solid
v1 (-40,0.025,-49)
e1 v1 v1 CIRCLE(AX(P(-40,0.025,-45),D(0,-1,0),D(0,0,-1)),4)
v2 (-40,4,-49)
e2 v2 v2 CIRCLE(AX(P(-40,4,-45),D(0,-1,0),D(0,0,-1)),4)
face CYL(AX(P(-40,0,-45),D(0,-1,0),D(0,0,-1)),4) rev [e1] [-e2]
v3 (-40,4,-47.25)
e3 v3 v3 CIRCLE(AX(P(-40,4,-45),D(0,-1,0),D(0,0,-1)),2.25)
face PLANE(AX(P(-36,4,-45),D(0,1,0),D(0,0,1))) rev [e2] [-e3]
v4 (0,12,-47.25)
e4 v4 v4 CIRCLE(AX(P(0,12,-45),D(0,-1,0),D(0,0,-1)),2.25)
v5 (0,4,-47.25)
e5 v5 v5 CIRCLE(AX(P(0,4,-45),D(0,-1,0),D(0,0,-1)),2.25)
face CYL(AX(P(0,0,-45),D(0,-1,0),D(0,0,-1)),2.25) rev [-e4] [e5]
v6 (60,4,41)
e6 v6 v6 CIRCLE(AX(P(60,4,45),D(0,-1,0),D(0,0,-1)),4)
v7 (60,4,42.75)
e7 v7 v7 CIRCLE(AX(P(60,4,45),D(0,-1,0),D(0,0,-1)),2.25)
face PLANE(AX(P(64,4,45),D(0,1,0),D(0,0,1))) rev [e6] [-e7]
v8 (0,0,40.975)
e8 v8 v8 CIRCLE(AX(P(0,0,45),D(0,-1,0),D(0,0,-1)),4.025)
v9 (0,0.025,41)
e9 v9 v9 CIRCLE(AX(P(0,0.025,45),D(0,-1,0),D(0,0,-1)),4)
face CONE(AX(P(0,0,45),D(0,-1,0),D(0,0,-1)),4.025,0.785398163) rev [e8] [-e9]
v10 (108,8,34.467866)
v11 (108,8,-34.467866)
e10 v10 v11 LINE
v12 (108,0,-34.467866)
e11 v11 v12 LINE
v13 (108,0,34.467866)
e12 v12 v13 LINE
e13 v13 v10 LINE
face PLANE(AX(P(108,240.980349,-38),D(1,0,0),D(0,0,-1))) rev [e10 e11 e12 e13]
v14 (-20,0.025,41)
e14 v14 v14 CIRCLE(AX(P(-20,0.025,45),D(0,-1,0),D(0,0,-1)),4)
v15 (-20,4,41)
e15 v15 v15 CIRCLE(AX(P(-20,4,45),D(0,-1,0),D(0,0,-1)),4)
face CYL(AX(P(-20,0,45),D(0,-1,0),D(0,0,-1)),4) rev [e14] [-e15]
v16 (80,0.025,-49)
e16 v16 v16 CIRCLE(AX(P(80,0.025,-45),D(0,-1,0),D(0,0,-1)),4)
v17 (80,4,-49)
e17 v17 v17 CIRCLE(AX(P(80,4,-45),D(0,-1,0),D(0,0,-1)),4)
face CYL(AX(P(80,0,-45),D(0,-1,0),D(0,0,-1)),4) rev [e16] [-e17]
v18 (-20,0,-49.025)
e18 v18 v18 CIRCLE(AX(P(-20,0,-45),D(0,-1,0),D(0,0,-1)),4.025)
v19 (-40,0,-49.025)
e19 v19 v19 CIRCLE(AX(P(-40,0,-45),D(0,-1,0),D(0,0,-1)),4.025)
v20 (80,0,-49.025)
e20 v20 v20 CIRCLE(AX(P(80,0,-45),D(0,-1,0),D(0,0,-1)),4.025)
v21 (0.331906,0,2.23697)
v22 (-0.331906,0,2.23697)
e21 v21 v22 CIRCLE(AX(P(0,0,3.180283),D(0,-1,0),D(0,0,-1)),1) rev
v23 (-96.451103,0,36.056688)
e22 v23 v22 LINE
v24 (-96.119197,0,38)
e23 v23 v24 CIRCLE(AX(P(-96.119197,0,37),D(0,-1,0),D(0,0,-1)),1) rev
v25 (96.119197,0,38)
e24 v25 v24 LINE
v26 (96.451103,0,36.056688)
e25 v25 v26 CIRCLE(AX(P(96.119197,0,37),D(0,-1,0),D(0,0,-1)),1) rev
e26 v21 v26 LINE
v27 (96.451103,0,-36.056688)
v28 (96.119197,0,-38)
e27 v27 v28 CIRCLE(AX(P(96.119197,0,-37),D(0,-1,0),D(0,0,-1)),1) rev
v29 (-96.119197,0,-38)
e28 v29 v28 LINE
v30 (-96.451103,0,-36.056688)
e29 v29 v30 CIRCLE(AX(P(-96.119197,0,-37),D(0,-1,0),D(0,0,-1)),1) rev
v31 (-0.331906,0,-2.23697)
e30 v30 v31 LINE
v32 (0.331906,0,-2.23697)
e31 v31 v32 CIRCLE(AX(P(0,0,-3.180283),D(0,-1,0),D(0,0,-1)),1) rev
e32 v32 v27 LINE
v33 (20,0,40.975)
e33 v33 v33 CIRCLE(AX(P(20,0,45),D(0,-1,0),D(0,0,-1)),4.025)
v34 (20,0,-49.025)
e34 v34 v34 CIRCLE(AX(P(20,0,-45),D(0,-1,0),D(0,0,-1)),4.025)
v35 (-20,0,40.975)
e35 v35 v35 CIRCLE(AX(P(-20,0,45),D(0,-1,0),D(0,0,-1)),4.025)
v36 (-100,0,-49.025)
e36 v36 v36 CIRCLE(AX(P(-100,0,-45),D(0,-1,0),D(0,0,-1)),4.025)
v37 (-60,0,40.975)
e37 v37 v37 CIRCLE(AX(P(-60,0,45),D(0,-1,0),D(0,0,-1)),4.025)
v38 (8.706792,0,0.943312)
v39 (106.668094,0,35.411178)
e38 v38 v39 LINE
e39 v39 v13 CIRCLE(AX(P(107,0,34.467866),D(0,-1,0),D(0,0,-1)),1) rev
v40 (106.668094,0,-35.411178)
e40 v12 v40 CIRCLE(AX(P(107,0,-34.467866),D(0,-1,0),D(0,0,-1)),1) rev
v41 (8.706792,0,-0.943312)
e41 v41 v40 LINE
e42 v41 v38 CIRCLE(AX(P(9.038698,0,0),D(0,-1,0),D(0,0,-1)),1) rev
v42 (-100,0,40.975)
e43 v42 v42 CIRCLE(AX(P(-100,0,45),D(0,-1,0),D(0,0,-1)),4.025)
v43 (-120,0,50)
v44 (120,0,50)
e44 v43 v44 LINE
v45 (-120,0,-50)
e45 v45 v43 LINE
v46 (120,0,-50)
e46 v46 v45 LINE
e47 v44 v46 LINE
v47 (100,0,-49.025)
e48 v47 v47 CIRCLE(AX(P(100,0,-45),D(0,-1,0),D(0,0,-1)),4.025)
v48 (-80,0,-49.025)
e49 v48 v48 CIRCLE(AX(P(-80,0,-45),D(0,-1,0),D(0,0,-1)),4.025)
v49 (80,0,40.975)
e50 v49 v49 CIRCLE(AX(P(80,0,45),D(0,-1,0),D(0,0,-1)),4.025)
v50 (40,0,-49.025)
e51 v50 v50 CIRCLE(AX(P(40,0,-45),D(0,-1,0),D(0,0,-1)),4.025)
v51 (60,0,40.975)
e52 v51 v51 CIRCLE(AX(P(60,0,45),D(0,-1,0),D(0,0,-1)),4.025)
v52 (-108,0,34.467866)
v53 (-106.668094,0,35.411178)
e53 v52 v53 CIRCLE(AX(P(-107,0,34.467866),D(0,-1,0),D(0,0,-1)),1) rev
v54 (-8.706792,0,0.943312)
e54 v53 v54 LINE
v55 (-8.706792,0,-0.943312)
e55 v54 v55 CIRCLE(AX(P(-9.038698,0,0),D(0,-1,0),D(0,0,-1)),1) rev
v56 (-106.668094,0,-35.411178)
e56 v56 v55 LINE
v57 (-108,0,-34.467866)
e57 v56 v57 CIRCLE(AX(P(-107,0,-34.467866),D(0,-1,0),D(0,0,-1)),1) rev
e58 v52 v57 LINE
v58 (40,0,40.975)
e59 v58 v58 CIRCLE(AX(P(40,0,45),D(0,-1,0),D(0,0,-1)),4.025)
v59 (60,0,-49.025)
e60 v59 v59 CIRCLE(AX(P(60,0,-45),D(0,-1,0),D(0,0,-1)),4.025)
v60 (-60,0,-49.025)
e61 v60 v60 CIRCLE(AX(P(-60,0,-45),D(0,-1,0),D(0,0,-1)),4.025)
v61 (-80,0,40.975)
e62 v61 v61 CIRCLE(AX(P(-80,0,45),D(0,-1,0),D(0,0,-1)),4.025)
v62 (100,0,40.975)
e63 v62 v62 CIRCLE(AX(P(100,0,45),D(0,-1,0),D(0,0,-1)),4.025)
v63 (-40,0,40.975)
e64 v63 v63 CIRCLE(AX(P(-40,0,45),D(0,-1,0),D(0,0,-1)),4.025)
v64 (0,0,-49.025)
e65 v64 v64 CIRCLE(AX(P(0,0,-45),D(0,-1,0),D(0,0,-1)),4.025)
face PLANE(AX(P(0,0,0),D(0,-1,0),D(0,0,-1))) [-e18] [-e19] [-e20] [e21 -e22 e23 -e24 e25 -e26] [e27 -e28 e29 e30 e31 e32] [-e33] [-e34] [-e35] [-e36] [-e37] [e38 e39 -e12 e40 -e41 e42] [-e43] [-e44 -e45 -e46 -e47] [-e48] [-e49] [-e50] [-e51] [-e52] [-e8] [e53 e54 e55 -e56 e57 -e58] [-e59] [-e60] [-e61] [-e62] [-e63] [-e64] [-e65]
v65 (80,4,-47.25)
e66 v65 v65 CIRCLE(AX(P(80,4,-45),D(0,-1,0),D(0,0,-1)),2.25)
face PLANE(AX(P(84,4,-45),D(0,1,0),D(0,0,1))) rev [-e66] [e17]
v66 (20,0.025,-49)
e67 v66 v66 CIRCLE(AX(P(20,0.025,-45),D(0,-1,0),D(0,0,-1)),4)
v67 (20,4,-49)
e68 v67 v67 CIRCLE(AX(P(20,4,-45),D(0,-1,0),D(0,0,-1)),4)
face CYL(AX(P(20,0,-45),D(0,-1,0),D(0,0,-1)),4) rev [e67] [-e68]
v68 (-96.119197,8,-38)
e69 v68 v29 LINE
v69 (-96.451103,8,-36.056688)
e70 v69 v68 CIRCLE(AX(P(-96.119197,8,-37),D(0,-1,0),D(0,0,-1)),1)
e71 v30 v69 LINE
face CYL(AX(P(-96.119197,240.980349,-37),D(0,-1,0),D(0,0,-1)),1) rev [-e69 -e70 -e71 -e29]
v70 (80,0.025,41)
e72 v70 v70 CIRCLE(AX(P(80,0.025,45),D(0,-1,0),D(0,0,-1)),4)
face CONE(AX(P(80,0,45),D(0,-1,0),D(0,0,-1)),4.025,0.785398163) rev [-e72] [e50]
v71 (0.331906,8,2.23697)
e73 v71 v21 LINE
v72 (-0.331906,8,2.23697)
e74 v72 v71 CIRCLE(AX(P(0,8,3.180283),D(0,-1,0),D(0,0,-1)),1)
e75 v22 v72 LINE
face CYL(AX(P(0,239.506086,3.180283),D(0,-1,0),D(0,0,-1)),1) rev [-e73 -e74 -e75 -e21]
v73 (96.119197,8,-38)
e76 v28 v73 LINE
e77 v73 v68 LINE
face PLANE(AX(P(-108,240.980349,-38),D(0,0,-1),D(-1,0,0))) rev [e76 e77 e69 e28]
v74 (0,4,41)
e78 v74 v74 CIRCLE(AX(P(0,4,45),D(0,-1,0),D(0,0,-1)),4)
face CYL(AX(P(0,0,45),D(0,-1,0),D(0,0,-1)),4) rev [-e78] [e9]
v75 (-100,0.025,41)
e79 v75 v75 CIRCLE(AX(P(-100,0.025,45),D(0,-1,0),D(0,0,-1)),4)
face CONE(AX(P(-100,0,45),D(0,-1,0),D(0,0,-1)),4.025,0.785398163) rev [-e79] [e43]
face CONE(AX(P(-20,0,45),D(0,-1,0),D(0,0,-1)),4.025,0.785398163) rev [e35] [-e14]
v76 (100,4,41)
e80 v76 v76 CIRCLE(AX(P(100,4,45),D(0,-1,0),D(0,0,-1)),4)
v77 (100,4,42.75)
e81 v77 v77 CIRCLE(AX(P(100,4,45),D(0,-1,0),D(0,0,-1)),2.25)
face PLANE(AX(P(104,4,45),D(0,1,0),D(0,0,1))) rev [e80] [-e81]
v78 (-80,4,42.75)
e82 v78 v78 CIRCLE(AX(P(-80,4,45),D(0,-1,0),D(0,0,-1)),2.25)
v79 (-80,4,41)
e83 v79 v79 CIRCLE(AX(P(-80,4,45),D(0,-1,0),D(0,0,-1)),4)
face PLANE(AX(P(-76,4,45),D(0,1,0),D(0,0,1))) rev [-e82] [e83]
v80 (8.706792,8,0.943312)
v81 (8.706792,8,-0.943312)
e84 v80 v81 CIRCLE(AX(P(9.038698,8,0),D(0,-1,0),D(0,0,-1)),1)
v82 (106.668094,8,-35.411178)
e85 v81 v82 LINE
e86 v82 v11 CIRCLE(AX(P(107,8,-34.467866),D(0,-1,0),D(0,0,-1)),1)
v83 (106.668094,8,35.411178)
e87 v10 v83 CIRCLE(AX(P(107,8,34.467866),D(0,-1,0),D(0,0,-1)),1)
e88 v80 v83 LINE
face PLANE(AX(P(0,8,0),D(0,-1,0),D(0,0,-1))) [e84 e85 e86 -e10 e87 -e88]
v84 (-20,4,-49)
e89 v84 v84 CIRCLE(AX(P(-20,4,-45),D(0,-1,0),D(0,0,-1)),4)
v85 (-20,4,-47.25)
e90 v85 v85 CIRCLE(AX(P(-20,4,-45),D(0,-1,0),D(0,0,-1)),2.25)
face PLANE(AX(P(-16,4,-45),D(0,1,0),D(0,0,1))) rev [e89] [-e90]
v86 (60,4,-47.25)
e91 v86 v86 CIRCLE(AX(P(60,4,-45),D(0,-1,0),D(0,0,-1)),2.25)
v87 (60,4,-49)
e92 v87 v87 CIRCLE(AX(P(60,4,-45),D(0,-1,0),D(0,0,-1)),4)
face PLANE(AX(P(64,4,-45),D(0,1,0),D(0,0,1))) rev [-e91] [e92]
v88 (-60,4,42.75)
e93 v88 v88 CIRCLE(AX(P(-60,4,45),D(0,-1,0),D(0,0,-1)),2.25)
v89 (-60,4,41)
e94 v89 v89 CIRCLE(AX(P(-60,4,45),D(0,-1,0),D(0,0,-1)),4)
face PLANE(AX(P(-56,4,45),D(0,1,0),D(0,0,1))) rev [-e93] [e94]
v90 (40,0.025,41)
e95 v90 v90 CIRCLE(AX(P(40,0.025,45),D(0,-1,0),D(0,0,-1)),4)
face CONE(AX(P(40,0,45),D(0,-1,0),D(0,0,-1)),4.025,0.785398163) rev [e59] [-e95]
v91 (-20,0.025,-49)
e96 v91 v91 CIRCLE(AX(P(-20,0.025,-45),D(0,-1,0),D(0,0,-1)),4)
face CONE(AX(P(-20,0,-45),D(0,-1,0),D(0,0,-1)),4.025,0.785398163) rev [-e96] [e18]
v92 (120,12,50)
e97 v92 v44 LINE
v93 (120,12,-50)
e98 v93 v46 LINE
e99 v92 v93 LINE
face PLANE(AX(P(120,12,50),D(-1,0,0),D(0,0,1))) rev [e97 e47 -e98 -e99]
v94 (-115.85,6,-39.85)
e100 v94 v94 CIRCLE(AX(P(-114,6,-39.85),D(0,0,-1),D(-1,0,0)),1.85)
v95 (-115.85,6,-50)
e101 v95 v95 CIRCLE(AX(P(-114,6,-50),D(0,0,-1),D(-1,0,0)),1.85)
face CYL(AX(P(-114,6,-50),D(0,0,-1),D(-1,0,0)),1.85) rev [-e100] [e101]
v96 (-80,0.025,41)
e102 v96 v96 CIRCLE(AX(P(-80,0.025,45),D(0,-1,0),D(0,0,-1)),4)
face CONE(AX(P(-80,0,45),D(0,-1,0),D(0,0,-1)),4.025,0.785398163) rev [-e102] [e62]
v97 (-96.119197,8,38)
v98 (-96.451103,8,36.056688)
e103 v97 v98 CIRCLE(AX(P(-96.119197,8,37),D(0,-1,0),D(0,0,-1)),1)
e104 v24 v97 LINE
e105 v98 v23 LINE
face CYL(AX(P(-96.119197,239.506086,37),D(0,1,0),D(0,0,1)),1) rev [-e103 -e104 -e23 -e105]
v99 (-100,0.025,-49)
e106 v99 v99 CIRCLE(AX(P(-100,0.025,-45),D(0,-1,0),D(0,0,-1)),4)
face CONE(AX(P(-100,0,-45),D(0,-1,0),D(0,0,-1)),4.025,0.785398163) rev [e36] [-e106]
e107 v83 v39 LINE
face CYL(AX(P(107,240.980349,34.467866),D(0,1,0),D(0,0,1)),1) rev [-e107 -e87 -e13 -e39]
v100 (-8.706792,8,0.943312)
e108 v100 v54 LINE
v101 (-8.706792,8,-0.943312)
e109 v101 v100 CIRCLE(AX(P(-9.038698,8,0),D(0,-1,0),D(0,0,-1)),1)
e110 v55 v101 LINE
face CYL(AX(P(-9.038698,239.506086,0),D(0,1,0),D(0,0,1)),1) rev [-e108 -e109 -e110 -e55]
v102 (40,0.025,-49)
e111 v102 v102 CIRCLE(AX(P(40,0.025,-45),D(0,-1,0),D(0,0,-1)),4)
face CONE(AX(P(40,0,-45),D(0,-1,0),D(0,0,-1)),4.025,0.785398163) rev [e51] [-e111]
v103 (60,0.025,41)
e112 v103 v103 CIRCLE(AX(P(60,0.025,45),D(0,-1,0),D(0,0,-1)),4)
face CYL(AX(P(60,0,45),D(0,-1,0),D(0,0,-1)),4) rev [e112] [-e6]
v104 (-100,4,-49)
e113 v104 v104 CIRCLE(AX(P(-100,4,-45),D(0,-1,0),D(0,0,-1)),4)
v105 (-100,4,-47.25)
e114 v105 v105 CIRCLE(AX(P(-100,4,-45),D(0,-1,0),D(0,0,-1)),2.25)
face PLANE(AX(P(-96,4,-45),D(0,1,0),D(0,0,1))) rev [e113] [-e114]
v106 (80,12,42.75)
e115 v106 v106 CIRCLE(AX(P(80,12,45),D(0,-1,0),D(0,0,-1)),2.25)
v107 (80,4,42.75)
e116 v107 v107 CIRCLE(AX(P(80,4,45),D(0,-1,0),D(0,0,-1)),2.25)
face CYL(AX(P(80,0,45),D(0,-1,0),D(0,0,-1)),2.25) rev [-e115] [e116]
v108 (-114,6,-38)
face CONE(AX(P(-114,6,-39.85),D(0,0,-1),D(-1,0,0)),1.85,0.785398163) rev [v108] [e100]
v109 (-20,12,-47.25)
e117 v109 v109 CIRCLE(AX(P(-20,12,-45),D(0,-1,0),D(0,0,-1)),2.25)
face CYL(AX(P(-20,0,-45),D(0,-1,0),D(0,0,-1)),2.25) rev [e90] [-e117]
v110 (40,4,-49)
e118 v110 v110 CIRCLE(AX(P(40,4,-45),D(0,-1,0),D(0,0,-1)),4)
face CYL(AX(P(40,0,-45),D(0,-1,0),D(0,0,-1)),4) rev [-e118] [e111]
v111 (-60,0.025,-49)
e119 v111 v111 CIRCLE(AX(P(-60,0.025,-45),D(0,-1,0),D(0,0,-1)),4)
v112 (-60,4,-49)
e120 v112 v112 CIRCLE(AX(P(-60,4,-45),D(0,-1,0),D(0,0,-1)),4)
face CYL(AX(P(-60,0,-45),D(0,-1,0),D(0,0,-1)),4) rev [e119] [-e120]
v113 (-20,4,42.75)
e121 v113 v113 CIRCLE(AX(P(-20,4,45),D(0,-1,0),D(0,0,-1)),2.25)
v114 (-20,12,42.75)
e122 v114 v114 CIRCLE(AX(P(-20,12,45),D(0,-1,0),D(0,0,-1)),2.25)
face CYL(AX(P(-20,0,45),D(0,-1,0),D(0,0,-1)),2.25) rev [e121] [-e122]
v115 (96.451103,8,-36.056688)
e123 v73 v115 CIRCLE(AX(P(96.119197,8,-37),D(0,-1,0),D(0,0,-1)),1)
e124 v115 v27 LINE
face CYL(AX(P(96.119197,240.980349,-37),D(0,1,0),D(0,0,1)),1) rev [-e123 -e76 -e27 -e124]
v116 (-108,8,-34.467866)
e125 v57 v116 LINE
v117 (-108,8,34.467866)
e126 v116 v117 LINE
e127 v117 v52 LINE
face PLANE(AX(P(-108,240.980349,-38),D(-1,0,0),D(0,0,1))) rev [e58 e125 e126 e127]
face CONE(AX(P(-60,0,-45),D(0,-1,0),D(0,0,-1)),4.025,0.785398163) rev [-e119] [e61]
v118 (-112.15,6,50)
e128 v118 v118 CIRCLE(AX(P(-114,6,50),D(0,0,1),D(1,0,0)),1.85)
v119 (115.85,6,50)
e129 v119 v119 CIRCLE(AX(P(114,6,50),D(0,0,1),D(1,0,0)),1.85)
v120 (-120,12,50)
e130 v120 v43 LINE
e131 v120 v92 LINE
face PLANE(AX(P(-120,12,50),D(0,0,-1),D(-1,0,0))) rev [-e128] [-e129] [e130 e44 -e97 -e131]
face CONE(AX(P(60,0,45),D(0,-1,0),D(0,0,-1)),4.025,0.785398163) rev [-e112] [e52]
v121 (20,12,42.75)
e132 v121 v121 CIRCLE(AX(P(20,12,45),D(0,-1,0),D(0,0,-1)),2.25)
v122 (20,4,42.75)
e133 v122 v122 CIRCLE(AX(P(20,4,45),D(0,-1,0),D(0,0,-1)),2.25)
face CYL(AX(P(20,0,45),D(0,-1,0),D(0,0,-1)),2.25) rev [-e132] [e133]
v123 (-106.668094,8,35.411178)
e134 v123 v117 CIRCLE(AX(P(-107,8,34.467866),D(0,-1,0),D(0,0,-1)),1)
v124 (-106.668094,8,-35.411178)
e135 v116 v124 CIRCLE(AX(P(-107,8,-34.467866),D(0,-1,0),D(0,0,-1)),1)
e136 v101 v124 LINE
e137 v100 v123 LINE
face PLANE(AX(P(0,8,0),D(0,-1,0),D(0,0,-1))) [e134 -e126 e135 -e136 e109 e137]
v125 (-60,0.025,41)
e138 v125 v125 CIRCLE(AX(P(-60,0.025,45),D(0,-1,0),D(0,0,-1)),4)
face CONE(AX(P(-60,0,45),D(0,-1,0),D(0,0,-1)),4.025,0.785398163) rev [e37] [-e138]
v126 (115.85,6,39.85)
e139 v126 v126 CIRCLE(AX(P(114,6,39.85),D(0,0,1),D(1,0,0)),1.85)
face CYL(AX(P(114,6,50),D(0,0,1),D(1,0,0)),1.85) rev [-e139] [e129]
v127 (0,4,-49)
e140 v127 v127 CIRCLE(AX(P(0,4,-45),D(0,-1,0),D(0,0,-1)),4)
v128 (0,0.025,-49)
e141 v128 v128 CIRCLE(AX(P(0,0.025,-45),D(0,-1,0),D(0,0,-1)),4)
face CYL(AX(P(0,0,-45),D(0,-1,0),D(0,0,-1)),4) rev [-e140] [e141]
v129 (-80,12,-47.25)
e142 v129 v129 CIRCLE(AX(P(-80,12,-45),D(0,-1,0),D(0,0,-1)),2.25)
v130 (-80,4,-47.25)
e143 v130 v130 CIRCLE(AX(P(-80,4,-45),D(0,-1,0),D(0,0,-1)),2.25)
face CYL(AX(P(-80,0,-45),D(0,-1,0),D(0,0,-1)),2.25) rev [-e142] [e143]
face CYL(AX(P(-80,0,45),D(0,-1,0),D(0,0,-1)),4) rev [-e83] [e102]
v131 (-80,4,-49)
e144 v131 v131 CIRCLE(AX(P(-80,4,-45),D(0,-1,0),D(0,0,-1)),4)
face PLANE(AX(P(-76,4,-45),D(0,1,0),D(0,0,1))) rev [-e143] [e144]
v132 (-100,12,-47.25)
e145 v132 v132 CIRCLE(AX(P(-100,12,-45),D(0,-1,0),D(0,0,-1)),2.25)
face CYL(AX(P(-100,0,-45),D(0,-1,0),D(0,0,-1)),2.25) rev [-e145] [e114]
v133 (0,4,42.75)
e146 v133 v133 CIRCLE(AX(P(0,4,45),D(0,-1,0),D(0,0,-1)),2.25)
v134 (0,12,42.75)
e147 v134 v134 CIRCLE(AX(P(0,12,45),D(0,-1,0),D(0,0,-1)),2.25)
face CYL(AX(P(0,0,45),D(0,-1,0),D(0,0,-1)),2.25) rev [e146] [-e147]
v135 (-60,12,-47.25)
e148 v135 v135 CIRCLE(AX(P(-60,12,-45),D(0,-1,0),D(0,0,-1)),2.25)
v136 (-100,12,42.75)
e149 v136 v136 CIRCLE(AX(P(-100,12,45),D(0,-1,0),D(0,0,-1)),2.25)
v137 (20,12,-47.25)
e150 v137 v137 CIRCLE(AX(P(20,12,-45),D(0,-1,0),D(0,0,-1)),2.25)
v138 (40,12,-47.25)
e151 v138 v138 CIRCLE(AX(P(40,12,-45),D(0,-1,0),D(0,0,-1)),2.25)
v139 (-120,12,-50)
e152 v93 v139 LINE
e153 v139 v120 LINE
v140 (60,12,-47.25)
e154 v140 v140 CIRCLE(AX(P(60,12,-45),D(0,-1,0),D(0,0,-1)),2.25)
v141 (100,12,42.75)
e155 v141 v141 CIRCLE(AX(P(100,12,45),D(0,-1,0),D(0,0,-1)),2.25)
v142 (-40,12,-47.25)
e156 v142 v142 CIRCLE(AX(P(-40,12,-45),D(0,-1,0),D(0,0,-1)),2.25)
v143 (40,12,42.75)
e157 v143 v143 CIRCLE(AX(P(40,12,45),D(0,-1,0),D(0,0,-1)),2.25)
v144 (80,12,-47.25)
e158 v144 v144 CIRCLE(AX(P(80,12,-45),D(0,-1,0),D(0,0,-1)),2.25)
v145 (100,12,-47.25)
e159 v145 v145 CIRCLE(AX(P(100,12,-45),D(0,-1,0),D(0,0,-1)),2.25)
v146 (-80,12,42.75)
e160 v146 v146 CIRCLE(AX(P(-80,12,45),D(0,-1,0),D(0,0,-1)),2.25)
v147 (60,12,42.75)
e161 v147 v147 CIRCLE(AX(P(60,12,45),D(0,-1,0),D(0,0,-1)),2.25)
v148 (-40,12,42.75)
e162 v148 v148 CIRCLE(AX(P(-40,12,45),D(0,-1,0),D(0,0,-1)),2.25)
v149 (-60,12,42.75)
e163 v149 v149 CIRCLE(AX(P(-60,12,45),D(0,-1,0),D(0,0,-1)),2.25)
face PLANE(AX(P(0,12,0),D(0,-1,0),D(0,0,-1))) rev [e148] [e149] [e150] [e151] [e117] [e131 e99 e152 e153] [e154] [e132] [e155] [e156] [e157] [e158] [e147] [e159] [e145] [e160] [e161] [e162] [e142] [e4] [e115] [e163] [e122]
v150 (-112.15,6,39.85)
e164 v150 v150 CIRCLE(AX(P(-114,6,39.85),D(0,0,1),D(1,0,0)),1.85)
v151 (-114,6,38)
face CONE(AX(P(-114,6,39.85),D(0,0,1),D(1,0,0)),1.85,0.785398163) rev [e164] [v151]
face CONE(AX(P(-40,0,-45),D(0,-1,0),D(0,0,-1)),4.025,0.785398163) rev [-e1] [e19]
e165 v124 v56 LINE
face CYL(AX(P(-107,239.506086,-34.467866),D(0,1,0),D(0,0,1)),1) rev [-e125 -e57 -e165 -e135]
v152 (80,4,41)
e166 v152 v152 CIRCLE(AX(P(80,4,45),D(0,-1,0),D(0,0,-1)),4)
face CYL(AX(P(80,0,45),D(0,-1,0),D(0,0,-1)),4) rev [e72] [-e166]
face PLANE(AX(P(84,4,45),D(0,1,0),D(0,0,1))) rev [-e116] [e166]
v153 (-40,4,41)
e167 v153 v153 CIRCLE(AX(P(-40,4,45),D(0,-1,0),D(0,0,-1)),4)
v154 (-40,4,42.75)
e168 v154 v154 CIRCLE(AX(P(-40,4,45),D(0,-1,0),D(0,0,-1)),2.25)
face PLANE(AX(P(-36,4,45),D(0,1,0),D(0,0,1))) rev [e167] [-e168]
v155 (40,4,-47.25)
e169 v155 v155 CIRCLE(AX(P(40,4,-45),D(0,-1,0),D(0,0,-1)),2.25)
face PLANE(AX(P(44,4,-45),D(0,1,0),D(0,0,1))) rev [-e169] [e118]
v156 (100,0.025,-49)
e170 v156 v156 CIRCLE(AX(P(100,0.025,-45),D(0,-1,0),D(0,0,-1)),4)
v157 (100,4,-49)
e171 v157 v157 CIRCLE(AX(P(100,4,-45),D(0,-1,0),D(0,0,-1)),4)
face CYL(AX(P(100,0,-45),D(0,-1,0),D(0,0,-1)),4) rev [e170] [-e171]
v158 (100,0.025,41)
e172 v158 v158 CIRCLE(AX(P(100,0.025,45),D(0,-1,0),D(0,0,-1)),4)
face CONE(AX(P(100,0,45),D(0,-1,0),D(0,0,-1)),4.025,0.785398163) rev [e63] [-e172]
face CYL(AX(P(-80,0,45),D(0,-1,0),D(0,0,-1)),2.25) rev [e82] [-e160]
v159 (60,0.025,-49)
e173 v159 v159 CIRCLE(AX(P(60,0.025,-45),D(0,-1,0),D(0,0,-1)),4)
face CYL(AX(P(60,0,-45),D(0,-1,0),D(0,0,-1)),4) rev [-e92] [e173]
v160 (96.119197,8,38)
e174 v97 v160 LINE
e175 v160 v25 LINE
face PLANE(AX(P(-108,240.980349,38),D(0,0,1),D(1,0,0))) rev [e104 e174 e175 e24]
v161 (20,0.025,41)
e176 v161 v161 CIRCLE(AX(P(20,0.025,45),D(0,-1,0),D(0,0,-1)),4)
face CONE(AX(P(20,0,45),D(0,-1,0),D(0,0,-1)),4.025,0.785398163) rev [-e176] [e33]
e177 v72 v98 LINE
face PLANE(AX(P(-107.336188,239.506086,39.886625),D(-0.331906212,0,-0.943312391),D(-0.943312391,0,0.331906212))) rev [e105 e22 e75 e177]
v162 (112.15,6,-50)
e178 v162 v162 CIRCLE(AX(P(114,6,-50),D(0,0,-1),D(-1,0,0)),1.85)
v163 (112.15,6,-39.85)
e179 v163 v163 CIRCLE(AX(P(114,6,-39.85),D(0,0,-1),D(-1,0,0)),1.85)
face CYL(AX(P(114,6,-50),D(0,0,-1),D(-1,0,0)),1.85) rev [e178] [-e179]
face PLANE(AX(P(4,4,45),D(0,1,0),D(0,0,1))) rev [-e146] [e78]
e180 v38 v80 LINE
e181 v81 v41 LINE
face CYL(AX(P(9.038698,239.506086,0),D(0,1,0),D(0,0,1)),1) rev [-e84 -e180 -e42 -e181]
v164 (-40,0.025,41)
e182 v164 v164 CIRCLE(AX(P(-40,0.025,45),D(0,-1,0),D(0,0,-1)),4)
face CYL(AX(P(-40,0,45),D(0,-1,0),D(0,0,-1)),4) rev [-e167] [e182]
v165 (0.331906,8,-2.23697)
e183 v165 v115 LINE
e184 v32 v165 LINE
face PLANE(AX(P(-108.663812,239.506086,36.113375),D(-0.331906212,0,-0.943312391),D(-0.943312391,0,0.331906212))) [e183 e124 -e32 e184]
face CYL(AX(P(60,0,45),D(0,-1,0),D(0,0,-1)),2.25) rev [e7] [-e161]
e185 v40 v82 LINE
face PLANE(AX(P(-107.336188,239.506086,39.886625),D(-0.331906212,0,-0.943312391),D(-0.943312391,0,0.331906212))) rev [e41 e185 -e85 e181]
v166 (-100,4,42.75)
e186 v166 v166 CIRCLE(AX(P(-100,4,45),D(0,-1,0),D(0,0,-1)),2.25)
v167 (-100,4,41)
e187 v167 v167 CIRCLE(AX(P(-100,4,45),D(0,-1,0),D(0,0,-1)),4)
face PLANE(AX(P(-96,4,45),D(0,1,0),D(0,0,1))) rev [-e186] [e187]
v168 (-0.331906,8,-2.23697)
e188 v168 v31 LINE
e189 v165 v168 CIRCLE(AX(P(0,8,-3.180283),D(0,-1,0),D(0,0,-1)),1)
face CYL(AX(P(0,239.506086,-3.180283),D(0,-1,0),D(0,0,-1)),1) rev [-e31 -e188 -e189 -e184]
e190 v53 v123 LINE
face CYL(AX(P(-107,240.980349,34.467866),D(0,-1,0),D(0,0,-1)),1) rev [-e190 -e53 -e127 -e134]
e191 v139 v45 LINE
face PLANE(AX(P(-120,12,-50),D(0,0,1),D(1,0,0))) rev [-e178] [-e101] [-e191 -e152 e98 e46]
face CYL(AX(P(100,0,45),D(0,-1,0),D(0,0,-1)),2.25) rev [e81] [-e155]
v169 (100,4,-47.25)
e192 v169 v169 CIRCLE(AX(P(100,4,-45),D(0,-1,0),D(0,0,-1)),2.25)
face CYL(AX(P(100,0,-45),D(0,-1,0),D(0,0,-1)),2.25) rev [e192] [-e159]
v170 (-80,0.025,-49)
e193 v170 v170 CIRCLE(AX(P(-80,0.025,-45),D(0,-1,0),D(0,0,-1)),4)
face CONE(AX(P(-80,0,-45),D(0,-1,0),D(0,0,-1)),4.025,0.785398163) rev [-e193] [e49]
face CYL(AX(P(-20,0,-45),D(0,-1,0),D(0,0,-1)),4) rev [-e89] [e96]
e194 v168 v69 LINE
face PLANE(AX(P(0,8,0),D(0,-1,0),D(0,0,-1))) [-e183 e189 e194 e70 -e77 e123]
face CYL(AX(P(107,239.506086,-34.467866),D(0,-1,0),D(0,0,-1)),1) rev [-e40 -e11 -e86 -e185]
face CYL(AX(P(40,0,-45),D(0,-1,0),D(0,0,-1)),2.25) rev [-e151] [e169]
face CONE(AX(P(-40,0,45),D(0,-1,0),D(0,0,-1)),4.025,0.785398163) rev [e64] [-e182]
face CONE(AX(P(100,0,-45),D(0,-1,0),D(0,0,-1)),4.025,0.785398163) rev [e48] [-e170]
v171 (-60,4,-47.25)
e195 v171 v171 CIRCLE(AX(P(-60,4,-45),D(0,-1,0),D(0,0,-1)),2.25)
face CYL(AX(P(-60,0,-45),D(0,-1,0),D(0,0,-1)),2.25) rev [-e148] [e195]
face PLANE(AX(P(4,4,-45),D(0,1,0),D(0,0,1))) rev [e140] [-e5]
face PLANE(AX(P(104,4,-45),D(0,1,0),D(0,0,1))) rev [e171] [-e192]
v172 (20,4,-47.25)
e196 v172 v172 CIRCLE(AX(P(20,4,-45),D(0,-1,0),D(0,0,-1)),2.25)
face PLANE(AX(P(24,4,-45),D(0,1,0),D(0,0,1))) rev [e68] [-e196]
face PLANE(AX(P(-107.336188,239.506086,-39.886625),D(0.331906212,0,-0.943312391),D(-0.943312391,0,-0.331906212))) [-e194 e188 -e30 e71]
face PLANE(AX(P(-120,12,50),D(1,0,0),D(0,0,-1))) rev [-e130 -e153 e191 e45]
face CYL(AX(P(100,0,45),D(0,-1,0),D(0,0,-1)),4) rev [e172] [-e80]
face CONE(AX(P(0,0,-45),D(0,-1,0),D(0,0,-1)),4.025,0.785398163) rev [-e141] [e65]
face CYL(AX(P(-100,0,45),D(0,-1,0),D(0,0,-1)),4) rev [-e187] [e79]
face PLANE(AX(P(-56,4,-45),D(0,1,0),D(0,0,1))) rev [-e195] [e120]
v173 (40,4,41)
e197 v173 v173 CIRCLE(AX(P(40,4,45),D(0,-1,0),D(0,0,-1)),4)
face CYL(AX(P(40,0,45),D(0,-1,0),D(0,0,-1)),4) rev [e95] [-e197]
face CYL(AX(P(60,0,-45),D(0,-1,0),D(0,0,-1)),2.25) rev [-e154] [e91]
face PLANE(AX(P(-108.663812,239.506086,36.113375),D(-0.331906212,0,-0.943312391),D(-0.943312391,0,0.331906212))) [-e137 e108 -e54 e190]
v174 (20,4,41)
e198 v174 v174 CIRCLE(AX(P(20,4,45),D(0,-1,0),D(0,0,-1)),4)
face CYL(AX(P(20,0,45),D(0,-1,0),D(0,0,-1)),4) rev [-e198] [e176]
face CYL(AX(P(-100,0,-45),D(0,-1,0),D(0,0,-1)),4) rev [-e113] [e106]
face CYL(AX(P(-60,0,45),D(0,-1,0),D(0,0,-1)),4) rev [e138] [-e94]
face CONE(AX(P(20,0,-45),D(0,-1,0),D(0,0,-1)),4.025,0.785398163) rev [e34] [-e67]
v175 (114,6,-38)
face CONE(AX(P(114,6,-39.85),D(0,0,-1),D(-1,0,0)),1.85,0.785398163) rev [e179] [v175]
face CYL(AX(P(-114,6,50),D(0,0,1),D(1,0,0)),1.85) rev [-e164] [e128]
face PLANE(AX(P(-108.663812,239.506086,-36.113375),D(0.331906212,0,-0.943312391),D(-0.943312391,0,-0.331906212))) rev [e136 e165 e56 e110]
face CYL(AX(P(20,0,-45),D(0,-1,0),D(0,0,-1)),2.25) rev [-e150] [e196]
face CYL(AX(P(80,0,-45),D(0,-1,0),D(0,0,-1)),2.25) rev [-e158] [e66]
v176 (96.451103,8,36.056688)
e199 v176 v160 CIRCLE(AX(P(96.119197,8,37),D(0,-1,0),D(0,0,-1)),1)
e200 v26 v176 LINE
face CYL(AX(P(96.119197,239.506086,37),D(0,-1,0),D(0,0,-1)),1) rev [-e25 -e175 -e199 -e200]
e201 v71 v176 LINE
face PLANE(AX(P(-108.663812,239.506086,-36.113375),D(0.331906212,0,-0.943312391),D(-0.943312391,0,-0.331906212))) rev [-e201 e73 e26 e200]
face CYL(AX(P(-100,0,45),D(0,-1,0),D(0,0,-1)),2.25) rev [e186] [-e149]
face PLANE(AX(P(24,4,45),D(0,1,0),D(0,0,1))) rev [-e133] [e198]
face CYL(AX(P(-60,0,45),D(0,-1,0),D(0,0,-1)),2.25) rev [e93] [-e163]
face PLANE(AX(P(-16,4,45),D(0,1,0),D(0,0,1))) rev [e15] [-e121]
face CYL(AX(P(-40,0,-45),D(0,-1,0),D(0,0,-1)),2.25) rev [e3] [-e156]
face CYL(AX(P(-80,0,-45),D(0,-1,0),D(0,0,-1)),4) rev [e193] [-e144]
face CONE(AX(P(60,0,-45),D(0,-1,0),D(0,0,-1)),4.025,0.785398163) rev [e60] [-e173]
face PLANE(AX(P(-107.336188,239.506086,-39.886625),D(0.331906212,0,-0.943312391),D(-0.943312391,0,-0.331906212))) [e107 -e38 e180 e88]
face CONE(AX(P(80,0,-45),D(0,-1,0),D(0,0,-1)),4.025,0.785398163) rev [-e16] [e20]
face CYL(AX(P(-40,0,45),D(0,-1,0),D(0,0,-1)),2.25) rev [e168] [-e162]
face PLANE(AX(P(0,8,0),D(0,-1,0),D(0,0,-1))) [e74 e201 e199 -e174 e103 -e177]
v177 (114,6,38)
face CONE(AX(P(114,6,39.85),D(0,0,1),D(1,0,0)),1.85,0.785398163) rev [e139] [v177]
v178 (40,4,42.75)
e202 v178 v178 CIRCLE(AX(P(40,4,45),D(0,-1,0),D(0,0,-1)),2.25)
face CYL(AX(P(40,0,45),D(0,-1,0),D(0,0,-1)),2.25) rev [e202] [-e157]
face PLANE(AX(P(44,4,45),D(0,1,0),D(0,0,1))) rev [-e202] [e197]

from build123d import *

# Parameters (mm, degrees)
SKETCH2_W           = 240
SKETCH2_H           = 100
BOSS_EXTRUDE1_DEPTH = 12
HOLE1_AT_2_COUNT    = 2
HOLE1_AT_2_PITCH    = 228
SKETCH10_W          = 216
SKETCH10_H          = 76
CUT_EXTRUDE2_DEPTH  = 8
EXTRUDE_THIN1_DEPTH = 8
FILLET1_R           = 1


# Read off the part's stored shape, not the designer's step: CBORE for M4 SHCS1
with BuildPart() as part:
    # Sketch2 → Boss-Extrude1 (new body)
    with BuildSketch(Plane(origin=(0, 0, 0), x_dir=(1, 0, 0), z_dir=(0, 1, 0))):
        Rectangle(SKETCH2_W, SKETCH2_H)
    extrude(amount=BOSS_EXTRUDE1_DEPTH)

    # Sketch6 → Hole1 (revolve, cut)
    with BuildSketch(Plane(origin=(-114, 6, 50), x_dir=(0, -1, 0), z_dir=(1, 0, 0))):
        Polygon((0, 0), (0, 12), (1.85, 10.15), (1.85, 0), align=None)
    hole1 = revolve(axis=Axis((-114, 6, 54.244199587), (0, 0, -1)), mode=Mode.SUBTRACT)

    # Hole1 at 2: Hole1 ×2
    with Locations(*[(i * HOLE1_AT_2_PITCH, 0, 0) for i in range(1, HOLE1_AT_2_COUNT)]):
        add(hole1, mode=Mode.SUBTRACT)

    # Mirror2: Hole1 across plane
    add(hole1.mirror(Plane.XY), mode=Mode.SUBTRACT)

    # Mirror2 copy 1 sketch → Mirror2 copy 1 (revolve, cut)
    with BuildSketch(Plane(origin=(114, 6, -50), x_dir=(0, -1, 0), z_dir=(1, 0, 0))):
        Polygon((0, 0), (0, -12), (1.85, -10.15), (1.85, 0), align=None)
    revolve(axis=Axis((114, 6, -54.244199587), (0, 0, -1)), mode=Mode.SUBTRACT)

    # CBORE for M4 SHCS1 outline → CBORE for M4 SHCS1 (revolve, cut)
    with BuildSketch(Plane(origin=(-100, 0, -45), x_dir=(1, 0, 0), z_dir=(0, 0, 1))):
        Polygon((2.25, 4), (2.25, 12), (0, 12), (0, 0), (4.025, 0), (4, 0.025), (4, 4), align=None)
    revolve(axis=Axis((-100, 0, -45), (0, 1, 0)), mode=Mode.SUBTRACT)

    # CBORE for M4 SHCS1 2 outline → CBORE for M4 SHCS1 2 (revolve, cut)
    with BuildSketch(Plane(origin=(-100, 0, 45), x_dir=(1, 0, 0), z_dir=(0, 0, 1))):
        Polygon((0, 0), (4.025, 0), (4, 0.025), (4, 4), (2.25, 4), (2.25, 12), (0, 12), align=None)
    revolve(axis=Axis((-100, 0, 45), (0, 1, 0)), mode=Mode.SUBTRACT)

    # CBORE for M4 SHCS1 3 outline → CBORE for M4 SHCS1 3 (revolve, cut)
    with BuildSketch(Plane(origin=(-80, 0, -45), x_dir=(1, 0, 0), z_dir=(0, 0, 1))):
        Polygon((0, 0), (4.025, 0), (4, 0.025), (4, 4), (2.25, 4), (2.25, 12), (0, 12), align=None)
    revolve(axis=Axis((-80, 0, -45), (0, 1, 0)), mode=Mode.SUBTRACT)

    # CBORE for M4 SHCS1 4 outline → CBORE for M4 SHCS1 4 (revolve, cut)
    with BuildSketch(Plane(origin=(-80, 0, 45), x_dir=(1, 0, 0), z_dir=(0, 0, 1))):
        Polygon((0, 0), (4.025, 0), (4, 0.025), (4, 4), (2.25, 4), (2.25, 12), (0, 12), align=None)
    revolve(axis=Axis((-80, 0, 45), (0, 1, 0)), mode=Mode.SUBTRACT)

    # CBORE for M4 SHCS1 5 outline → CBORE for M4 SHCS1 5 (revolve, cut)
    with BuildSketch(Plane(origin=(-60, 0, -45), x_dir=(1, 0, 0), z_dir=(0, 0, 1))):
        Polygon((0, 0), (4.025, 0), (4, 0.025), (4, 4), (2.25, 4), (2.25, 12), (0, 12), align=None)
    revolve(axis=Axis((-60, 0, -45), (0, 1, 0)), mode=Mode.SUBTRACT)

    # CBORE for M4 SHCS1 6 outline → CBORE for M4 SHCS1 6 (revolve, cut)
    with BuildSketch(Plane(origin=(-60, 0, 45), x_dir=(1, 0, 0), z_dir=(0, 0, 1))):
        Polygon((0, 0), (4.025, 0), (4, 0.025), (4, 4), (2.25, 4), (2.25, 12), (0, 12), align=None)
    revolve(axis=Axis((-60, 0, 45), (0, 1, 0)), mode=Mode.SUBTRACT)

    # CBORE for M4 SHCS1 7 outline → CBORE for M4 SHCS1 7 (revolve, cut)
    with BuildSketch(Plane(origin=(-40, 0, -45), x_dir=(1, 0, 0), z_dir=(0, 0, 1))):
        Polygon((0, 0), (4.025, 0), (4, 0.025), (4, 4), (2.25, 4), (2.25, 12), (0, 12), align=None)
    revolve(axis=Axis((-40, 0, -45), (0, 1, 0)), mode=Mode.SUBTRACT)

    # CBORE for M4 SHCS1 8 outline → CBORE for M4 SHCS1 8 (revolve, cut)
    with BuildSketch(Plane(origin=(-40, 0, 45), x_dir=(1, 0, 0), z_dir=(0, 0, 1))):
        Polygon((0, 0), (4.025, 0), (4, 0.025), (4, 4), (2.25, 4), (2.25, 12), (0, 12), align=None)
    revolve(axis=Axis((-40, 0, 45), (0, 1, 0)), mode=Mode.SUBTRACT)

    # CBORE for M4 SHCS1 9 outline → CBORE for M4 SHCS1 9 (revolve, cut)
    with BuildSketch(Plane(origin=(-20, 0, -45), x_dir=(1, 0, 0), z_dir=(0, 0, 1))):
        Polygon((0, 0), (4.025, 0), (4, 0.025), (4, 4), (2.25, 4), (2.25, 12), (0, 12), align=None)
    revolve(axis=Axis((-20, 0, -45), (0, 1, 0)), mode=Mode.SUBTRACT)

    # CBORE for M4 SHCS1 10 outline → CBORE for M4 SHCS1 10 (revolve, cut)
    with BuildSketch(Plane(origin=(-20, 0, 45), x_dir=(1, 0, 0), z_dir=(0, 0, 1))):
        Polygon((0, 0), (4.025, 0), (4, 0.025), (4, 4), (2.25, 4), (2.25, 12), (0, 12), align=None)
    revolve(axis=Axis((-20, 0, 45), (0, 1, 0)), mode=Mode.SUBTRACT)

    # CBORE for M4 SHCS1 11 outline → CBORE for M4 SHCS1 11 (revolve, cut)
    with BuildSketch(Plane.XY.offset(-45)):
        Polygon((0, 0), (4.025, 0), (4, 0.025), (4, 4), (2.25, 4), (2.25, 12), (0, 12), align=None)
    revolve(axis=Axis((0, 0, -45), (0, 1, 0)), mode=Mode.SUBTRACT)

    # CBORE for M4 SHCS1 12 outline → CBORE for M4 SHCS1 12 (revolve, cut)
    with BuildSketch(Plane.XY.offset(45)):
        Polygon((0, 0), (4.025, 0), (4, 0.025), (4, 4), (2.25, 4), (2.25, 12), (0, 12), align=None)
    revolve(axis=Axis((0, 0, 45), (0, 1, 0)), mode=Mode.SUBTRACT)

    # CBORE for M4 SHCS1 13 outline → CBORE for M4 SHCS1 13 (revolve, cut)
    with BuildSketch(Plane(origin=(20, 0, -45), x_dir=(1, 0, 0), z_dir=(0, 0, 1))):
        Polygon((0, 0), (4.025, 0), (4, 0.025), (4, 4), (2.25, 4), (2.25, 12), (0, 12), align=None)
    revolve(axis=Axis((20, 0, -45), (0, 1, 0)), mode=Mode.SUBTRACT)

    # CBORE for M4 SHCS1 14 outline → CBORE for M4 SHCS1 14 (revolve, cut)
    with BuildSketch(Plane(origin=(20, 0, 45), x_dir=(1, 0, 0), z_dir=(0, 0, 1))):
        Polygon((0, 0), (4.025, 0), (4, 0.025), (4, 4), (2.25, 4), (2.25, 12), (0, 12), align=None)
    revolve(axis=Axis((20, 0, 45), (0, 1, 0)), mode=Mode.SUBTRACT)

    # CBORE for M4 SHCS1 15 outline → CBORE for M4 SHCS1 15 (revolve, cut)
    with BuildSketch(Plane(origin=(40, 0, -45), x_dir=(1, 0, 0), z_dir=(0, 0, 1))):
        Polygon((0, 0), (4.025, 0), (4, 0.025), (4, 4), (2.25, 4), (2.25, 12), (0, 12), align=None)
    revolve(axis=Axis((40, 0, -45), (0, 1, 0)), mode=Mode.SUBTRACT)

    # CBORE for M4 SHCS1 16 outline → CBORE for M4 SHCS1 16 (revolve, cut)
    with BuildSketch(Plane(origin=(40, 0, 45), x_dir=(1, 0, 0), z_dir=(0, 0, 1))):
        Polygon((0, 0), (4.025, 0), (4, 0.025), (4, 4), (2.25, 4), (2.25, 12), (0, 12), align=None)
    revolve(axis=Axis((40, 0, 45), (0, 1, 0)), mode=Mode.SUBTRACT)

    # CBORE for M4 SHCS1 17 outline → CBORE for M4 SHCS1 17 (revolve, cut)
    with BuildSketch(Plane(origin=(60, 0, -45), x_dir=(1, 0, 0), z_dir=(0, 0, 1))):
        Polygon((0, 0), (4.025, 0), (4, 0.025), (4, 4), (2.25, 4), (2.25, 12), (0, 12), align=None)
    revolve(axis=Axis((60, 0, -45), (0, 1, 0)), mode=Mode.SUBTRACT)

    # CBORE for M4 SHCS1 18 outline → CBORE for M4 SHCS1 18 (revolve, cut)
    with BuildSketch(Plane(origin=(60, 0, 45), x_dir=(1, 0, 0), z_dir=(0, 0, 1))):
        Polygon((0, 0), (4.025, 0), (4, 0.025), (4, 4), (2.25, 4), (2.25, 12), (0, 12), align=None)
    revolve(axis=Axis((60, 0, 45), (0, 1, 0)), mode=Mode.SUBTRACT)

    # CBORE for M4 SHCS1 19 outline → CBORE for M4 SHCS1 19 (revolve, cut)
    with BuildSketch(Plane(origin=(80, 0, -45), x_dir=(1, 0, 0), z_dir=(0, 0, 1))):
        Polygon((0, 0), (4.025, 0), (4, 0.025), (4, 4), (2.25, 4), (2.25, 12), (0, 12), align=None)
    revolve(axis=Axis((80, 0, -45), (0, 1, 0)), mode=Mode.SUBTRACT)

    # CBORE for M4 SHCS1 20 outline → CBORE for M4 SHCS1 20 (revolve, cut)
    with BuildSketch(Plane(origin=(80, 0, 45), x_dir=(1, 0, 0), z_dir=(0, 0, 1))):
        Polygon((0, 0), (4.025, 0), (4, 0.025), (4, 4), (2.25, 4), (2.25, 12), (0, 12), align=None)
    revolve(axis=Axis((80, 0, 45), (0, 1, 0)), mode=Mode.SUBTRACT)

    # CBORE for M4 SHCS1 21 outline → CBORE for M4 SHCS1 21 (revolve, cut)
    with BuildSketch(Plane(origin=(100, 0, -45), x_dir=(1, 0, 0), z_dir=(0, 0, 1))):
        Polygon((0, 0), (4.025, 0), (4, 0.025), (4, 4), (2.25, 4), (2.25, 12), (0, 12), align=None)
    revolve(axis=Axis((100, 0, -45), (0, 1, 0)), mode=Mode.SUBTRACT)

    # CBORE for M4 SHCS1 22 outline → CBORE for M4 SHCS1 22 (revolve, cut)
    with BuildSketch(Plane(origin=(100, 0, 45), x_dir=(1, 0, 0), z_dir=(0, 0, 1))):
        Polygon((0, 0), (4.025, 0), (4, 0.025), (4, 4), (2.25, 4), (2.25, 12), (0, 12), align=None)
    revolve(axis=Axis((100, 0, 45), (0, 1, 0)), mode=Mode.SUBTRACT)

    # Sketch10 → Cut-Extrude2 (cut)
    with BuildSketch(Plane.XZ):
        Rectangle(SKETCH10_W, SKETCH10_H)
    extrude(amount=-CUT_EXTRUDE2_DEPTH, mode=Mode.SUBTRACT)

    # Sketch11 → Extrude-Thin1 (add)
    with BuildSketch(Plane.XZ):
        Polygon((-107.336187577, -39.886624782), (108.663812423, 36.113375218), (107.336187577, 39.886624782), (-108.663812423, -36.113375218), align=None)
        Polygon((-108.663812423, 36.113375218), (107.336187577, -39.886624782), (108.663812423, -36.113375218), (-107.336187577, 39.886624782), align=None)
    extrude(amount=-EXTRUDE_THIN1_DEPTH)

    # Fillet1
    fillet1_edges = [part.edges().sort_by_distance(p)[0] for p in [
        (101.974201355, 4, 38),
        (6.025798645, 4, 0),
        (-108, 4, -35.879811588),
        (-6.025798645, 4, 0),
        (0, 4, -2.120188412),
        (108, 4, -35.879811588),
        (-101.974201355, 4, 38),
        (0, 4, 2.120188412),
        (108, 4, 35.879811588),
        (-101.974201355, 4, -38),
        (101.974201355, 4, -38),
        (-108, 4, 35.879811588),
    ]]
    fillet(fillet1_edges, radius=FILLET1_R)


solid = part.part
